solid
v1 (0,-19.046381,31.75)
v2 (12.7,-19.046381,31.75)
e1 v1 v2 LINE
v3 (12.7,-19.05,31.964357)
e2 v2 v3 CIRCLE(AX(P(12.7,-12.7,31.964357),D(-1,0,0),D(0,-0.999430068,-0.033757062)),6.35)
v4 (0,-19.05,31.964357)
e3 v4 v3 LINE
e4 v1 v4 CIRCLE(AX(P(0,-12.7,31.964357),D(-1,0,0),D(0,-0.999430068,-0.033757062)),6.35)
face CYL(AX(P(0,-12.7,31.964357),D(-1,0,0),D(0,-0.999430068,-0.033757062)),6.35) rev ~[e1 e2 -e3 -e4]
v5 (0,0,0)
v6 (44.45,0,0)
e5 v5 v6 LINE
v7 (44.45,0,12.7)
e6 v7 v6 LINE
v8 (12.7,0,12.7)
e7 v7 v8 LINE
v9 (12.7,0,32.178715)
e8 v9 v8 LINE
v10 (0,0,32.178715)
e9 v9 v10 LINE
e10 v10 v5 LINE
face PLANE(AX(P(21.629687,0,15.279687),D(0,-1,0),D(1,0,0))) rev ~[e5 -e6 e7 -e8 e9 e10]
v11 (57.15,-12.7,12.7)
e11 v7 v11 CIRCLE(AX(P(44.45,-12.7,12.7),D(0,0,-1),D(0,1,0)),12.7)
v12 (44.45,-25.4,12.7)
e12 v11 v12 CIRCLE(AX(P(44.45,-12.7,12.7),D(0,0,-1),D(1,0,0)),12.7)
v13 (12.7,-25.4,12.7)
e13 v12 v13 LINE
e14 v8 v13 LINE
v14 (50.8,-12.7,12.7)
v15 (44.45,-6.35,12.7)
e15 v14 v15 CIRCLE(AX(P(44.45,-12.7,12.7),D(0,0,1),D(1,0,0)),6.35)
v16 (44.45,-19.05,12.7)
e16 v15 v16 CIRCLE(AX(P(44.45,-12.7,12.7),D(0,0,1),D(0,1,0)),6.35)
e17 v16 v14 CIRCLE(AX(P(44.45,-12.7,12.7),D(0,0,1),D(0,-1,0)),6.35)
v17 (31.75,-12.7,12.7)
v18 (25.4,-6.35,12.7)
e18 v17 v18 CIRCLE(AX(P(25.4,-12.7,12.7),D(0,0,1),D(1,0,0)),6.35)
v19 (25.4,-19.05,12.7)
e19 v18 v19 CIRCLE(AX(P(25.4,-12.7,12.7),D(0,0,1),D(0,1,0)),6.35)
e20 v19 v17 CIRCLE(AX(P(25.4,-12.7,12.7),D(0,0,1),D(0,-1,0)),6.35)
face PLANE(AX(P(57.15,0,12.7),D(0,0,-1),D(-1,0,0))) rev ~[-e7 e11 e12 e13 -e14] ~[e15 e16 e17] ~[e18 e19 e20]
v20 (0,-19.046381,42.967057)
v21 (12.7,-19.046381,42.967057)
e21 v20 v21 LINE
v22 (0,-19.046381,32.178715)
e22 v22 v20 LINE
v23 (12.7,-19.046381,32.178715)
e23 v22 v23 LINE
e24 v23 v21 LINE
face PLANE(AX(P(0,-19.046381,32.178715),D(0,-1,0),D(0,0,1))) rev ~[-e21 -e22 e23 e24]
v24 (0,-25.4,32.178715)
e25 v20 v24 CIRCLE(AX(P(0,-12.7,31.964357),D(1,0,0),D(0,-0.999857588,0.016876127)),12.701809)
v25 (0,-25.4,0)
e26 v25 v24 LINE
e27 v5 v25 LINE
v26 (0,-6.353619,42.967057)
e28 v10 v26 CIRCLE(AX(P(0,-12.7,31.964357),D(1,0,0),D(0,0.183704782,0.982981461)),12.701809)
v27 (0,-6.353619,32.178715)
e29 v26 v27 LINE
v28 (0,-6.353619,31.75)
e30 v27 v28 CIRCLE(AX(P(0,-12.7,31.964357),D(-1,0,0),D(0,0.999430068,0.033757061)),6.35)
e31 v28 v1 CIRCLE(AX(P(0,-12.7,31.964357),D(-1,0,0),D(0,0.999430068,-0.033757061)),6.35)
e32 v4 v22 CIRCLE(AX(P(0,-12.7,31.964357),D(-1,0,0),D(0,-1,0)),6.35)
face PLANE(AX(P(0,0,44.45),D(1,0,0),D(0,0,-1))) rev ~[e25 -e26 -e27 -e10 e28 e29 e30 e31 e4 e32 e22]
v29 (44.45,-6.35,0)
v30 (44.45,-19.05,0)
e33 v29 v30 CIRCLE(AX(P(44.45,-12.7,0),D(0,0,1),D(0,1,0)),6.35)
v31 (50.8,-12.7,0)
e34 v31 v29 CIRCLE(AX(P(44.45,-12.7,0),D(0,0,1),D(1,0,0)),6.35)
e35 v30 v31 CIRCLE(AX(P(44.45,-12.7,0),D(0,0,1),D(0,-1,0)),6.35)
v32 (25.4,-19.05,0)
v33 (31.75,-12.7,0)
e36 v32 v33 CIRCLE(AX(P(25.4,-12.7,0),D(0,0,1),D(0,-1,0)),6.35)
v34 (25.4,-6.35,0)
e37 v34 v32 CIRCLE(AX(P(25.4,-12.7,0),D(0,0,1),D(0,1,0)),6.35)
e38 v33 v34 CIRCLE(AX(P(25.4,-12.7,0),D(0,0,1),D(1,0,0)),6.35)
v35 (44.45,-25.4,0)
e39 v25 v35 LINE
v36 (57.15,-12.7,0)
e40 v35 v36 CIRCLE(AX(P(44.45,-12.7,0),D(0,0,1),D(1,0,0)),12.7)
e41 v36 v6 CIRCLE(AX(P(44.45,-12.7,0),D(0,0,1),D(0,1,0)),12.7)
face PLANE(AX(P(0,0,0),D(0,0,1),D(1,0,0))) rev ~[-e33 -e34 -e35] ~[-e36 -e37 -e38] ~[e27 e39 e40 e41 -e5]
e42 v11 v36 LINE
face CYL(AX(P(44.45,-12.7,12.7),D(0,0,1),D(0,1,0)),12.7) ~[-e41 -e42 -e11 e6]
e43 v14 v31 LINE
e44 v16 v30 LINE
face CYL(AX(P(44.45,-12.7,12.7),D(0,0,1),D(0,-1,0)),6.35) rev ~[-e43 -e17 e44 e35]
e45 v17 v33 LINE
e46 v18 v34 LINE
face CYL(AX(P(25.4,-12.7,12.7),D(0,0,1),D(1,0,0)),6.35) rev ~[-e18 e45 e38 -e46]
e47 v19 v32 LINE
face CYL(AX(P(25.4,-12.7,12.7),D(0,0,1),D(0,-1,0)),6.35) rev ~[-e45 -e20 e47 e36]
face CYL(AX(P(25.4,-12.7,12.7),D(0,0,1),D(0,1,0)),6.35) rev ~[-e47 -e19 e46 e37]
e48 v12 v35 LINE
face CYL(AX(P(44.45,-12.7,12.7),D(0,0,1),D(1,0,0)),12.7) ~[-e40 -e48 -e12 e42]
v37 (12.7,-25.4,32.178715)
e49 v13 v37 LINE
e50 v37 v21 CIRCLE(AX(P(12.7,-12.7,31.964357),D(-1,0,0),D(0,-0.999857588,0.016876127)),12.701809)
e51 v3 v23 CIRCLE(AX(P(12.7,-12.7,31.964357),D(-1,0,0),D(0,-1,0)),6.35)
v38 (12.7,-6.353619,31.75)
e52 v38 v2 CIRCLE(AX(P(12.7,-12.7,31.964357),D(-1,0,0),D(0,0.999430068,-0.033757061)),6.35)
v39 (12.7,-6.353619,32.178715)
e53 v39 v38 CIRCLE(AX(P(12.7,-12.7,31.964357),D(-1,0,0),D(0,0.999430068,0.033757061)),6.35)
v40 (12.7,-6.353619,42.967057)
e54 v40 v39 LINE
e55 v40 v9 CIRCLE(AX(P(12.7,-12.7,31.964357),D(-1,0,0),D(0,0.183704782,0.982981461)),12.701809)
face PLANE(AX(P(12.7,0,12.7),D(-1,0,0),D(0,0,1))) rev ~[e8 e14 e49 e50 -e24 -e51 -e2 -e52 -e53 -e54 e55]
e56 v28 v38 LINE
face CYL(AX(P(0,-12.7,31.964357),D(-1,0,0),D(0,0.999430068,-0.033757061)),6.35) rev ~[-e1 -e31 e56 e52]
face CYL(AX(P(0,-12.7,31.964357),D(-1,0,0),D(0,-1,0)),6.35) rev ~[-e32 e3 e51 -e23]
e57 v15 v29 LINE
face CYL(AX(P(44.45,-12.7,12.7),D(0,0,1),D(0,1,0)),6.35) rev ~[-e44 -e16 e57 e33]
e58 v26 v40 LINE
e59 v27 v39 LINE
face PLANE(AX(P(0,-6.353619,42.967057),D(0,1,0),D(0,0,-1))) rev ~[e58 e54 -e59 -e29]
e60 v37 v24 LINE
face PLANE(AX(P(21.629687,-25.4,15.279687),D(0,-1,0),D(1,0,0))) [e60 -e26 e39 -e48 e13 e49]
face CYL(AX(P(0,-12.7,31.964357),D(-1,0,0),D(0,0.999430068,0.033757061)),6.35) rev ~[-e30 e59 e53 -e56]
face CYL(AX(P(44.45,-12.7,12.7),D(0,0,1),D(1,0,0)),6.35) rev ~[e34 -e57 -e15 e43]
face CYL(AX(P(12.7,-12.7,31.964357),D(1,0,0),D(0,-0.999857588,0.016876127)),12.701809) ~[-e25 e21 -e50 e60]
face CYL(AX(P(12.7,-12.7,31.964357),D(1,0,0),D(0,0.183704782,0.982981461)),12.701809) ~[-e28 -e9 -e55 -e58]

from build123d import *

# Parameters (mm, degrees)
F1_DEPTH = 25.4
F3_DEPTH = 12.701
F5_DEPTH = 12.701
F7_DEPTH = 57.151


with BuildPart() as f1:
    # F0 (on Front) → F1 (new body)
    with BuildSketch(Plane.XZ):
        Polygon((0, 44.45), (0, 0), (57.15, 0), (57.15, 12.7), (12.7, 12.7), (12.7, 44.45), align=None)
    extrude(amount=F1_DEPTH)

    # F2 (on face) → F3 (cut, through all)
    with BuildSketch(Plane.XY.offset(12.7)):
        with BuildLine():
            Line((25.4, -19.05), (25.4, -6.35))
            ThreePointArc((25.4, -6.35), (19.05, -12.7), (25.4, -19.05))
        make_face()
        with BuildLine():
            ThreePointArc((31.75, -12.7), (29.8901280605, -8.2098719395), (25.4, -6.35))
            Line((25.4, -6.35), (25.4, -19.05))
            ThreePointArc((25.4, -19.05), (29.8901280605, -17.1901280605), (31.75, -12.7))
        make_face()
        with BuildLine():
            Line((44.45, -19.05), (44.45, -6.35))
            ThreePointArc((44.45, -6.35), (38.1, -12.7), (44.45, -19.05))
        make_face()
        with BuildLine():
            ThreePointArc((50.8, -12.7), (48.9401280605, -8.2098719395), (44.45, -6.35))
            Line((44.45, -6.35), (44.45, -19.05))
            ThreePointArc((44.45, -19.05), (48.9401280605, -17.1901280605), (50.8, -12.7))
        make_face()
        with BuildLine():
            Line((57.15, 0), (44.45, 0))
            ThreePointArc((44.45, 0), (53.4302561211, -3.7197438789), (57.15, -12.7))
            Line((57.15, -12.7), (57.15, 0))
        make_face()
        with BuildLine():
            Line((57.15, -25.4), (57.15, -12.7))
            ThreePointArc((57.15, -12.7), (53.4302561211, -21.6802561211), (44.45, -25.4))
            Line((44.45, -25.4), (57.15, -25.4))
        make_face()
    extrude(amount=-F3_DEPTH, mode=Mode.SUBTRACT)

    # F4 (on face) → F5 (cut, through all)
    with BuildSketch(Plane.YZ.offset(12.7)):
        with BuildLine():
            ThreePointArc((-25.4, 32.1787146746), (-25.4018088896, 31.9643573373), (-25.4, 31.75))
            Line((-25.4, 31.75), (-25.4, 32.1787146746))
        make_face()
        with BuildLine():
            Line((0, 32.1787146746), (0, 31.75))
            ThreePointArc((0, 31.75), (0.0018088896, 31.9643573373), (0, 32.1787146746))
        make_face()
        with BuildLine():
            Line((-25.4, 44.45), (-25.4, 32.1787146746))
            ThreePointArc((-25.4, 32.1787146746), (-22.4029254465, 40.1612583888), (-15.0333830306, 44.45))
            Line((-15.0333830306, 44.45), (-25.4, 44.45))
        make_face()
        with BuildLine():
            ThreePointArc((-10.3666169694, 44.45), (-2.9970745535, 40.1612583888), (0, 32.1787146746))
            Line((0, 32.1787146746), (0, 44.45))
            Line((0, 44.45), (-10.3666169694, 44.45))
        make_face()
    extrude(amount=-F5_DEPTH, mode=Mode.SUBTRACT)

    # F6 (on face) → F7 (cut, through all)
    with BuildSketch(Plane(origin=(0, 0, 0), x_dir=(0, -1, 0), z_dir=(-1, 0, 0))):
        with BuildLine():
            Line((6.3536190682, 32.1787146746), (6.3536190682, 31.75))
            Line((6.3536190682, 31.75), (19.0463809318, 31.75))
            Line((19.0463809318, 31.75), (19.0463809318, 32.1787146746))
            ThreePointArc((19.0463809318, 32.1787146746), (12.7, 38.3143573373), (6.3536190682, 32.1787146746))
        make_face()
        with BuildLine():
            Line((19.0463809318, 31.75), (6.3536190682, 31.75))
            ThreePointArc((6.3536190682, 31.75), (12.7, 25.6143573373), (19.0463809318, 31.75))
        make_face()
        with BuildLine():
            ThreePointArc((6.3536190682, 32.1787146746), (6.35, 31.9643573373), (6.3536190682, 31.75))
            Line((6.3536190682, 31.75), (6.3536190682, 32.1787146746))
        make_face()
        with BuildLine():
            Line((19.0463809318, 32.1787146746), (19.0463809318, 31.75))
            ThreePointArc((19.0463809318, 31.75), (19.0490951685, 31.8571633942), (19.05, 31.9643573373))
            ThreePointArc((19.05, 31.9643573373), (19.0490951685, 32.0715512803), (19.0463809318, 32.1787146746))
        make_face()
        with BuildLine():
            Line((6.3536190682, 42.9670569213), (6.3536190682, 32.1787146746))
            ThreePointArc((6.3536190682, 32.1787146746), (12.7, 38.3143573373), (19.0463809318, 32.1787146746))
            Line((19.0463809318, 32.1787146746), (19.0463809318, 42.9670569213))
            ThreePointArc((19.0463809318, 42.9670569213), (17.1027668181, 43.8787013567), (15.0333830306, 44.45))
            Line((15.0333830306, 44.45), (10.3666169694, 44.45))
            ThreePointArc((10.3666169694, 44.45), (8.2972331819, 43.8787013567), (6.3536190682, 42.9670569213))
        make_face()
    extrude(amount=-F7_DEPTH, mode=Mode.SUBTRACT)


solid = f1.part
